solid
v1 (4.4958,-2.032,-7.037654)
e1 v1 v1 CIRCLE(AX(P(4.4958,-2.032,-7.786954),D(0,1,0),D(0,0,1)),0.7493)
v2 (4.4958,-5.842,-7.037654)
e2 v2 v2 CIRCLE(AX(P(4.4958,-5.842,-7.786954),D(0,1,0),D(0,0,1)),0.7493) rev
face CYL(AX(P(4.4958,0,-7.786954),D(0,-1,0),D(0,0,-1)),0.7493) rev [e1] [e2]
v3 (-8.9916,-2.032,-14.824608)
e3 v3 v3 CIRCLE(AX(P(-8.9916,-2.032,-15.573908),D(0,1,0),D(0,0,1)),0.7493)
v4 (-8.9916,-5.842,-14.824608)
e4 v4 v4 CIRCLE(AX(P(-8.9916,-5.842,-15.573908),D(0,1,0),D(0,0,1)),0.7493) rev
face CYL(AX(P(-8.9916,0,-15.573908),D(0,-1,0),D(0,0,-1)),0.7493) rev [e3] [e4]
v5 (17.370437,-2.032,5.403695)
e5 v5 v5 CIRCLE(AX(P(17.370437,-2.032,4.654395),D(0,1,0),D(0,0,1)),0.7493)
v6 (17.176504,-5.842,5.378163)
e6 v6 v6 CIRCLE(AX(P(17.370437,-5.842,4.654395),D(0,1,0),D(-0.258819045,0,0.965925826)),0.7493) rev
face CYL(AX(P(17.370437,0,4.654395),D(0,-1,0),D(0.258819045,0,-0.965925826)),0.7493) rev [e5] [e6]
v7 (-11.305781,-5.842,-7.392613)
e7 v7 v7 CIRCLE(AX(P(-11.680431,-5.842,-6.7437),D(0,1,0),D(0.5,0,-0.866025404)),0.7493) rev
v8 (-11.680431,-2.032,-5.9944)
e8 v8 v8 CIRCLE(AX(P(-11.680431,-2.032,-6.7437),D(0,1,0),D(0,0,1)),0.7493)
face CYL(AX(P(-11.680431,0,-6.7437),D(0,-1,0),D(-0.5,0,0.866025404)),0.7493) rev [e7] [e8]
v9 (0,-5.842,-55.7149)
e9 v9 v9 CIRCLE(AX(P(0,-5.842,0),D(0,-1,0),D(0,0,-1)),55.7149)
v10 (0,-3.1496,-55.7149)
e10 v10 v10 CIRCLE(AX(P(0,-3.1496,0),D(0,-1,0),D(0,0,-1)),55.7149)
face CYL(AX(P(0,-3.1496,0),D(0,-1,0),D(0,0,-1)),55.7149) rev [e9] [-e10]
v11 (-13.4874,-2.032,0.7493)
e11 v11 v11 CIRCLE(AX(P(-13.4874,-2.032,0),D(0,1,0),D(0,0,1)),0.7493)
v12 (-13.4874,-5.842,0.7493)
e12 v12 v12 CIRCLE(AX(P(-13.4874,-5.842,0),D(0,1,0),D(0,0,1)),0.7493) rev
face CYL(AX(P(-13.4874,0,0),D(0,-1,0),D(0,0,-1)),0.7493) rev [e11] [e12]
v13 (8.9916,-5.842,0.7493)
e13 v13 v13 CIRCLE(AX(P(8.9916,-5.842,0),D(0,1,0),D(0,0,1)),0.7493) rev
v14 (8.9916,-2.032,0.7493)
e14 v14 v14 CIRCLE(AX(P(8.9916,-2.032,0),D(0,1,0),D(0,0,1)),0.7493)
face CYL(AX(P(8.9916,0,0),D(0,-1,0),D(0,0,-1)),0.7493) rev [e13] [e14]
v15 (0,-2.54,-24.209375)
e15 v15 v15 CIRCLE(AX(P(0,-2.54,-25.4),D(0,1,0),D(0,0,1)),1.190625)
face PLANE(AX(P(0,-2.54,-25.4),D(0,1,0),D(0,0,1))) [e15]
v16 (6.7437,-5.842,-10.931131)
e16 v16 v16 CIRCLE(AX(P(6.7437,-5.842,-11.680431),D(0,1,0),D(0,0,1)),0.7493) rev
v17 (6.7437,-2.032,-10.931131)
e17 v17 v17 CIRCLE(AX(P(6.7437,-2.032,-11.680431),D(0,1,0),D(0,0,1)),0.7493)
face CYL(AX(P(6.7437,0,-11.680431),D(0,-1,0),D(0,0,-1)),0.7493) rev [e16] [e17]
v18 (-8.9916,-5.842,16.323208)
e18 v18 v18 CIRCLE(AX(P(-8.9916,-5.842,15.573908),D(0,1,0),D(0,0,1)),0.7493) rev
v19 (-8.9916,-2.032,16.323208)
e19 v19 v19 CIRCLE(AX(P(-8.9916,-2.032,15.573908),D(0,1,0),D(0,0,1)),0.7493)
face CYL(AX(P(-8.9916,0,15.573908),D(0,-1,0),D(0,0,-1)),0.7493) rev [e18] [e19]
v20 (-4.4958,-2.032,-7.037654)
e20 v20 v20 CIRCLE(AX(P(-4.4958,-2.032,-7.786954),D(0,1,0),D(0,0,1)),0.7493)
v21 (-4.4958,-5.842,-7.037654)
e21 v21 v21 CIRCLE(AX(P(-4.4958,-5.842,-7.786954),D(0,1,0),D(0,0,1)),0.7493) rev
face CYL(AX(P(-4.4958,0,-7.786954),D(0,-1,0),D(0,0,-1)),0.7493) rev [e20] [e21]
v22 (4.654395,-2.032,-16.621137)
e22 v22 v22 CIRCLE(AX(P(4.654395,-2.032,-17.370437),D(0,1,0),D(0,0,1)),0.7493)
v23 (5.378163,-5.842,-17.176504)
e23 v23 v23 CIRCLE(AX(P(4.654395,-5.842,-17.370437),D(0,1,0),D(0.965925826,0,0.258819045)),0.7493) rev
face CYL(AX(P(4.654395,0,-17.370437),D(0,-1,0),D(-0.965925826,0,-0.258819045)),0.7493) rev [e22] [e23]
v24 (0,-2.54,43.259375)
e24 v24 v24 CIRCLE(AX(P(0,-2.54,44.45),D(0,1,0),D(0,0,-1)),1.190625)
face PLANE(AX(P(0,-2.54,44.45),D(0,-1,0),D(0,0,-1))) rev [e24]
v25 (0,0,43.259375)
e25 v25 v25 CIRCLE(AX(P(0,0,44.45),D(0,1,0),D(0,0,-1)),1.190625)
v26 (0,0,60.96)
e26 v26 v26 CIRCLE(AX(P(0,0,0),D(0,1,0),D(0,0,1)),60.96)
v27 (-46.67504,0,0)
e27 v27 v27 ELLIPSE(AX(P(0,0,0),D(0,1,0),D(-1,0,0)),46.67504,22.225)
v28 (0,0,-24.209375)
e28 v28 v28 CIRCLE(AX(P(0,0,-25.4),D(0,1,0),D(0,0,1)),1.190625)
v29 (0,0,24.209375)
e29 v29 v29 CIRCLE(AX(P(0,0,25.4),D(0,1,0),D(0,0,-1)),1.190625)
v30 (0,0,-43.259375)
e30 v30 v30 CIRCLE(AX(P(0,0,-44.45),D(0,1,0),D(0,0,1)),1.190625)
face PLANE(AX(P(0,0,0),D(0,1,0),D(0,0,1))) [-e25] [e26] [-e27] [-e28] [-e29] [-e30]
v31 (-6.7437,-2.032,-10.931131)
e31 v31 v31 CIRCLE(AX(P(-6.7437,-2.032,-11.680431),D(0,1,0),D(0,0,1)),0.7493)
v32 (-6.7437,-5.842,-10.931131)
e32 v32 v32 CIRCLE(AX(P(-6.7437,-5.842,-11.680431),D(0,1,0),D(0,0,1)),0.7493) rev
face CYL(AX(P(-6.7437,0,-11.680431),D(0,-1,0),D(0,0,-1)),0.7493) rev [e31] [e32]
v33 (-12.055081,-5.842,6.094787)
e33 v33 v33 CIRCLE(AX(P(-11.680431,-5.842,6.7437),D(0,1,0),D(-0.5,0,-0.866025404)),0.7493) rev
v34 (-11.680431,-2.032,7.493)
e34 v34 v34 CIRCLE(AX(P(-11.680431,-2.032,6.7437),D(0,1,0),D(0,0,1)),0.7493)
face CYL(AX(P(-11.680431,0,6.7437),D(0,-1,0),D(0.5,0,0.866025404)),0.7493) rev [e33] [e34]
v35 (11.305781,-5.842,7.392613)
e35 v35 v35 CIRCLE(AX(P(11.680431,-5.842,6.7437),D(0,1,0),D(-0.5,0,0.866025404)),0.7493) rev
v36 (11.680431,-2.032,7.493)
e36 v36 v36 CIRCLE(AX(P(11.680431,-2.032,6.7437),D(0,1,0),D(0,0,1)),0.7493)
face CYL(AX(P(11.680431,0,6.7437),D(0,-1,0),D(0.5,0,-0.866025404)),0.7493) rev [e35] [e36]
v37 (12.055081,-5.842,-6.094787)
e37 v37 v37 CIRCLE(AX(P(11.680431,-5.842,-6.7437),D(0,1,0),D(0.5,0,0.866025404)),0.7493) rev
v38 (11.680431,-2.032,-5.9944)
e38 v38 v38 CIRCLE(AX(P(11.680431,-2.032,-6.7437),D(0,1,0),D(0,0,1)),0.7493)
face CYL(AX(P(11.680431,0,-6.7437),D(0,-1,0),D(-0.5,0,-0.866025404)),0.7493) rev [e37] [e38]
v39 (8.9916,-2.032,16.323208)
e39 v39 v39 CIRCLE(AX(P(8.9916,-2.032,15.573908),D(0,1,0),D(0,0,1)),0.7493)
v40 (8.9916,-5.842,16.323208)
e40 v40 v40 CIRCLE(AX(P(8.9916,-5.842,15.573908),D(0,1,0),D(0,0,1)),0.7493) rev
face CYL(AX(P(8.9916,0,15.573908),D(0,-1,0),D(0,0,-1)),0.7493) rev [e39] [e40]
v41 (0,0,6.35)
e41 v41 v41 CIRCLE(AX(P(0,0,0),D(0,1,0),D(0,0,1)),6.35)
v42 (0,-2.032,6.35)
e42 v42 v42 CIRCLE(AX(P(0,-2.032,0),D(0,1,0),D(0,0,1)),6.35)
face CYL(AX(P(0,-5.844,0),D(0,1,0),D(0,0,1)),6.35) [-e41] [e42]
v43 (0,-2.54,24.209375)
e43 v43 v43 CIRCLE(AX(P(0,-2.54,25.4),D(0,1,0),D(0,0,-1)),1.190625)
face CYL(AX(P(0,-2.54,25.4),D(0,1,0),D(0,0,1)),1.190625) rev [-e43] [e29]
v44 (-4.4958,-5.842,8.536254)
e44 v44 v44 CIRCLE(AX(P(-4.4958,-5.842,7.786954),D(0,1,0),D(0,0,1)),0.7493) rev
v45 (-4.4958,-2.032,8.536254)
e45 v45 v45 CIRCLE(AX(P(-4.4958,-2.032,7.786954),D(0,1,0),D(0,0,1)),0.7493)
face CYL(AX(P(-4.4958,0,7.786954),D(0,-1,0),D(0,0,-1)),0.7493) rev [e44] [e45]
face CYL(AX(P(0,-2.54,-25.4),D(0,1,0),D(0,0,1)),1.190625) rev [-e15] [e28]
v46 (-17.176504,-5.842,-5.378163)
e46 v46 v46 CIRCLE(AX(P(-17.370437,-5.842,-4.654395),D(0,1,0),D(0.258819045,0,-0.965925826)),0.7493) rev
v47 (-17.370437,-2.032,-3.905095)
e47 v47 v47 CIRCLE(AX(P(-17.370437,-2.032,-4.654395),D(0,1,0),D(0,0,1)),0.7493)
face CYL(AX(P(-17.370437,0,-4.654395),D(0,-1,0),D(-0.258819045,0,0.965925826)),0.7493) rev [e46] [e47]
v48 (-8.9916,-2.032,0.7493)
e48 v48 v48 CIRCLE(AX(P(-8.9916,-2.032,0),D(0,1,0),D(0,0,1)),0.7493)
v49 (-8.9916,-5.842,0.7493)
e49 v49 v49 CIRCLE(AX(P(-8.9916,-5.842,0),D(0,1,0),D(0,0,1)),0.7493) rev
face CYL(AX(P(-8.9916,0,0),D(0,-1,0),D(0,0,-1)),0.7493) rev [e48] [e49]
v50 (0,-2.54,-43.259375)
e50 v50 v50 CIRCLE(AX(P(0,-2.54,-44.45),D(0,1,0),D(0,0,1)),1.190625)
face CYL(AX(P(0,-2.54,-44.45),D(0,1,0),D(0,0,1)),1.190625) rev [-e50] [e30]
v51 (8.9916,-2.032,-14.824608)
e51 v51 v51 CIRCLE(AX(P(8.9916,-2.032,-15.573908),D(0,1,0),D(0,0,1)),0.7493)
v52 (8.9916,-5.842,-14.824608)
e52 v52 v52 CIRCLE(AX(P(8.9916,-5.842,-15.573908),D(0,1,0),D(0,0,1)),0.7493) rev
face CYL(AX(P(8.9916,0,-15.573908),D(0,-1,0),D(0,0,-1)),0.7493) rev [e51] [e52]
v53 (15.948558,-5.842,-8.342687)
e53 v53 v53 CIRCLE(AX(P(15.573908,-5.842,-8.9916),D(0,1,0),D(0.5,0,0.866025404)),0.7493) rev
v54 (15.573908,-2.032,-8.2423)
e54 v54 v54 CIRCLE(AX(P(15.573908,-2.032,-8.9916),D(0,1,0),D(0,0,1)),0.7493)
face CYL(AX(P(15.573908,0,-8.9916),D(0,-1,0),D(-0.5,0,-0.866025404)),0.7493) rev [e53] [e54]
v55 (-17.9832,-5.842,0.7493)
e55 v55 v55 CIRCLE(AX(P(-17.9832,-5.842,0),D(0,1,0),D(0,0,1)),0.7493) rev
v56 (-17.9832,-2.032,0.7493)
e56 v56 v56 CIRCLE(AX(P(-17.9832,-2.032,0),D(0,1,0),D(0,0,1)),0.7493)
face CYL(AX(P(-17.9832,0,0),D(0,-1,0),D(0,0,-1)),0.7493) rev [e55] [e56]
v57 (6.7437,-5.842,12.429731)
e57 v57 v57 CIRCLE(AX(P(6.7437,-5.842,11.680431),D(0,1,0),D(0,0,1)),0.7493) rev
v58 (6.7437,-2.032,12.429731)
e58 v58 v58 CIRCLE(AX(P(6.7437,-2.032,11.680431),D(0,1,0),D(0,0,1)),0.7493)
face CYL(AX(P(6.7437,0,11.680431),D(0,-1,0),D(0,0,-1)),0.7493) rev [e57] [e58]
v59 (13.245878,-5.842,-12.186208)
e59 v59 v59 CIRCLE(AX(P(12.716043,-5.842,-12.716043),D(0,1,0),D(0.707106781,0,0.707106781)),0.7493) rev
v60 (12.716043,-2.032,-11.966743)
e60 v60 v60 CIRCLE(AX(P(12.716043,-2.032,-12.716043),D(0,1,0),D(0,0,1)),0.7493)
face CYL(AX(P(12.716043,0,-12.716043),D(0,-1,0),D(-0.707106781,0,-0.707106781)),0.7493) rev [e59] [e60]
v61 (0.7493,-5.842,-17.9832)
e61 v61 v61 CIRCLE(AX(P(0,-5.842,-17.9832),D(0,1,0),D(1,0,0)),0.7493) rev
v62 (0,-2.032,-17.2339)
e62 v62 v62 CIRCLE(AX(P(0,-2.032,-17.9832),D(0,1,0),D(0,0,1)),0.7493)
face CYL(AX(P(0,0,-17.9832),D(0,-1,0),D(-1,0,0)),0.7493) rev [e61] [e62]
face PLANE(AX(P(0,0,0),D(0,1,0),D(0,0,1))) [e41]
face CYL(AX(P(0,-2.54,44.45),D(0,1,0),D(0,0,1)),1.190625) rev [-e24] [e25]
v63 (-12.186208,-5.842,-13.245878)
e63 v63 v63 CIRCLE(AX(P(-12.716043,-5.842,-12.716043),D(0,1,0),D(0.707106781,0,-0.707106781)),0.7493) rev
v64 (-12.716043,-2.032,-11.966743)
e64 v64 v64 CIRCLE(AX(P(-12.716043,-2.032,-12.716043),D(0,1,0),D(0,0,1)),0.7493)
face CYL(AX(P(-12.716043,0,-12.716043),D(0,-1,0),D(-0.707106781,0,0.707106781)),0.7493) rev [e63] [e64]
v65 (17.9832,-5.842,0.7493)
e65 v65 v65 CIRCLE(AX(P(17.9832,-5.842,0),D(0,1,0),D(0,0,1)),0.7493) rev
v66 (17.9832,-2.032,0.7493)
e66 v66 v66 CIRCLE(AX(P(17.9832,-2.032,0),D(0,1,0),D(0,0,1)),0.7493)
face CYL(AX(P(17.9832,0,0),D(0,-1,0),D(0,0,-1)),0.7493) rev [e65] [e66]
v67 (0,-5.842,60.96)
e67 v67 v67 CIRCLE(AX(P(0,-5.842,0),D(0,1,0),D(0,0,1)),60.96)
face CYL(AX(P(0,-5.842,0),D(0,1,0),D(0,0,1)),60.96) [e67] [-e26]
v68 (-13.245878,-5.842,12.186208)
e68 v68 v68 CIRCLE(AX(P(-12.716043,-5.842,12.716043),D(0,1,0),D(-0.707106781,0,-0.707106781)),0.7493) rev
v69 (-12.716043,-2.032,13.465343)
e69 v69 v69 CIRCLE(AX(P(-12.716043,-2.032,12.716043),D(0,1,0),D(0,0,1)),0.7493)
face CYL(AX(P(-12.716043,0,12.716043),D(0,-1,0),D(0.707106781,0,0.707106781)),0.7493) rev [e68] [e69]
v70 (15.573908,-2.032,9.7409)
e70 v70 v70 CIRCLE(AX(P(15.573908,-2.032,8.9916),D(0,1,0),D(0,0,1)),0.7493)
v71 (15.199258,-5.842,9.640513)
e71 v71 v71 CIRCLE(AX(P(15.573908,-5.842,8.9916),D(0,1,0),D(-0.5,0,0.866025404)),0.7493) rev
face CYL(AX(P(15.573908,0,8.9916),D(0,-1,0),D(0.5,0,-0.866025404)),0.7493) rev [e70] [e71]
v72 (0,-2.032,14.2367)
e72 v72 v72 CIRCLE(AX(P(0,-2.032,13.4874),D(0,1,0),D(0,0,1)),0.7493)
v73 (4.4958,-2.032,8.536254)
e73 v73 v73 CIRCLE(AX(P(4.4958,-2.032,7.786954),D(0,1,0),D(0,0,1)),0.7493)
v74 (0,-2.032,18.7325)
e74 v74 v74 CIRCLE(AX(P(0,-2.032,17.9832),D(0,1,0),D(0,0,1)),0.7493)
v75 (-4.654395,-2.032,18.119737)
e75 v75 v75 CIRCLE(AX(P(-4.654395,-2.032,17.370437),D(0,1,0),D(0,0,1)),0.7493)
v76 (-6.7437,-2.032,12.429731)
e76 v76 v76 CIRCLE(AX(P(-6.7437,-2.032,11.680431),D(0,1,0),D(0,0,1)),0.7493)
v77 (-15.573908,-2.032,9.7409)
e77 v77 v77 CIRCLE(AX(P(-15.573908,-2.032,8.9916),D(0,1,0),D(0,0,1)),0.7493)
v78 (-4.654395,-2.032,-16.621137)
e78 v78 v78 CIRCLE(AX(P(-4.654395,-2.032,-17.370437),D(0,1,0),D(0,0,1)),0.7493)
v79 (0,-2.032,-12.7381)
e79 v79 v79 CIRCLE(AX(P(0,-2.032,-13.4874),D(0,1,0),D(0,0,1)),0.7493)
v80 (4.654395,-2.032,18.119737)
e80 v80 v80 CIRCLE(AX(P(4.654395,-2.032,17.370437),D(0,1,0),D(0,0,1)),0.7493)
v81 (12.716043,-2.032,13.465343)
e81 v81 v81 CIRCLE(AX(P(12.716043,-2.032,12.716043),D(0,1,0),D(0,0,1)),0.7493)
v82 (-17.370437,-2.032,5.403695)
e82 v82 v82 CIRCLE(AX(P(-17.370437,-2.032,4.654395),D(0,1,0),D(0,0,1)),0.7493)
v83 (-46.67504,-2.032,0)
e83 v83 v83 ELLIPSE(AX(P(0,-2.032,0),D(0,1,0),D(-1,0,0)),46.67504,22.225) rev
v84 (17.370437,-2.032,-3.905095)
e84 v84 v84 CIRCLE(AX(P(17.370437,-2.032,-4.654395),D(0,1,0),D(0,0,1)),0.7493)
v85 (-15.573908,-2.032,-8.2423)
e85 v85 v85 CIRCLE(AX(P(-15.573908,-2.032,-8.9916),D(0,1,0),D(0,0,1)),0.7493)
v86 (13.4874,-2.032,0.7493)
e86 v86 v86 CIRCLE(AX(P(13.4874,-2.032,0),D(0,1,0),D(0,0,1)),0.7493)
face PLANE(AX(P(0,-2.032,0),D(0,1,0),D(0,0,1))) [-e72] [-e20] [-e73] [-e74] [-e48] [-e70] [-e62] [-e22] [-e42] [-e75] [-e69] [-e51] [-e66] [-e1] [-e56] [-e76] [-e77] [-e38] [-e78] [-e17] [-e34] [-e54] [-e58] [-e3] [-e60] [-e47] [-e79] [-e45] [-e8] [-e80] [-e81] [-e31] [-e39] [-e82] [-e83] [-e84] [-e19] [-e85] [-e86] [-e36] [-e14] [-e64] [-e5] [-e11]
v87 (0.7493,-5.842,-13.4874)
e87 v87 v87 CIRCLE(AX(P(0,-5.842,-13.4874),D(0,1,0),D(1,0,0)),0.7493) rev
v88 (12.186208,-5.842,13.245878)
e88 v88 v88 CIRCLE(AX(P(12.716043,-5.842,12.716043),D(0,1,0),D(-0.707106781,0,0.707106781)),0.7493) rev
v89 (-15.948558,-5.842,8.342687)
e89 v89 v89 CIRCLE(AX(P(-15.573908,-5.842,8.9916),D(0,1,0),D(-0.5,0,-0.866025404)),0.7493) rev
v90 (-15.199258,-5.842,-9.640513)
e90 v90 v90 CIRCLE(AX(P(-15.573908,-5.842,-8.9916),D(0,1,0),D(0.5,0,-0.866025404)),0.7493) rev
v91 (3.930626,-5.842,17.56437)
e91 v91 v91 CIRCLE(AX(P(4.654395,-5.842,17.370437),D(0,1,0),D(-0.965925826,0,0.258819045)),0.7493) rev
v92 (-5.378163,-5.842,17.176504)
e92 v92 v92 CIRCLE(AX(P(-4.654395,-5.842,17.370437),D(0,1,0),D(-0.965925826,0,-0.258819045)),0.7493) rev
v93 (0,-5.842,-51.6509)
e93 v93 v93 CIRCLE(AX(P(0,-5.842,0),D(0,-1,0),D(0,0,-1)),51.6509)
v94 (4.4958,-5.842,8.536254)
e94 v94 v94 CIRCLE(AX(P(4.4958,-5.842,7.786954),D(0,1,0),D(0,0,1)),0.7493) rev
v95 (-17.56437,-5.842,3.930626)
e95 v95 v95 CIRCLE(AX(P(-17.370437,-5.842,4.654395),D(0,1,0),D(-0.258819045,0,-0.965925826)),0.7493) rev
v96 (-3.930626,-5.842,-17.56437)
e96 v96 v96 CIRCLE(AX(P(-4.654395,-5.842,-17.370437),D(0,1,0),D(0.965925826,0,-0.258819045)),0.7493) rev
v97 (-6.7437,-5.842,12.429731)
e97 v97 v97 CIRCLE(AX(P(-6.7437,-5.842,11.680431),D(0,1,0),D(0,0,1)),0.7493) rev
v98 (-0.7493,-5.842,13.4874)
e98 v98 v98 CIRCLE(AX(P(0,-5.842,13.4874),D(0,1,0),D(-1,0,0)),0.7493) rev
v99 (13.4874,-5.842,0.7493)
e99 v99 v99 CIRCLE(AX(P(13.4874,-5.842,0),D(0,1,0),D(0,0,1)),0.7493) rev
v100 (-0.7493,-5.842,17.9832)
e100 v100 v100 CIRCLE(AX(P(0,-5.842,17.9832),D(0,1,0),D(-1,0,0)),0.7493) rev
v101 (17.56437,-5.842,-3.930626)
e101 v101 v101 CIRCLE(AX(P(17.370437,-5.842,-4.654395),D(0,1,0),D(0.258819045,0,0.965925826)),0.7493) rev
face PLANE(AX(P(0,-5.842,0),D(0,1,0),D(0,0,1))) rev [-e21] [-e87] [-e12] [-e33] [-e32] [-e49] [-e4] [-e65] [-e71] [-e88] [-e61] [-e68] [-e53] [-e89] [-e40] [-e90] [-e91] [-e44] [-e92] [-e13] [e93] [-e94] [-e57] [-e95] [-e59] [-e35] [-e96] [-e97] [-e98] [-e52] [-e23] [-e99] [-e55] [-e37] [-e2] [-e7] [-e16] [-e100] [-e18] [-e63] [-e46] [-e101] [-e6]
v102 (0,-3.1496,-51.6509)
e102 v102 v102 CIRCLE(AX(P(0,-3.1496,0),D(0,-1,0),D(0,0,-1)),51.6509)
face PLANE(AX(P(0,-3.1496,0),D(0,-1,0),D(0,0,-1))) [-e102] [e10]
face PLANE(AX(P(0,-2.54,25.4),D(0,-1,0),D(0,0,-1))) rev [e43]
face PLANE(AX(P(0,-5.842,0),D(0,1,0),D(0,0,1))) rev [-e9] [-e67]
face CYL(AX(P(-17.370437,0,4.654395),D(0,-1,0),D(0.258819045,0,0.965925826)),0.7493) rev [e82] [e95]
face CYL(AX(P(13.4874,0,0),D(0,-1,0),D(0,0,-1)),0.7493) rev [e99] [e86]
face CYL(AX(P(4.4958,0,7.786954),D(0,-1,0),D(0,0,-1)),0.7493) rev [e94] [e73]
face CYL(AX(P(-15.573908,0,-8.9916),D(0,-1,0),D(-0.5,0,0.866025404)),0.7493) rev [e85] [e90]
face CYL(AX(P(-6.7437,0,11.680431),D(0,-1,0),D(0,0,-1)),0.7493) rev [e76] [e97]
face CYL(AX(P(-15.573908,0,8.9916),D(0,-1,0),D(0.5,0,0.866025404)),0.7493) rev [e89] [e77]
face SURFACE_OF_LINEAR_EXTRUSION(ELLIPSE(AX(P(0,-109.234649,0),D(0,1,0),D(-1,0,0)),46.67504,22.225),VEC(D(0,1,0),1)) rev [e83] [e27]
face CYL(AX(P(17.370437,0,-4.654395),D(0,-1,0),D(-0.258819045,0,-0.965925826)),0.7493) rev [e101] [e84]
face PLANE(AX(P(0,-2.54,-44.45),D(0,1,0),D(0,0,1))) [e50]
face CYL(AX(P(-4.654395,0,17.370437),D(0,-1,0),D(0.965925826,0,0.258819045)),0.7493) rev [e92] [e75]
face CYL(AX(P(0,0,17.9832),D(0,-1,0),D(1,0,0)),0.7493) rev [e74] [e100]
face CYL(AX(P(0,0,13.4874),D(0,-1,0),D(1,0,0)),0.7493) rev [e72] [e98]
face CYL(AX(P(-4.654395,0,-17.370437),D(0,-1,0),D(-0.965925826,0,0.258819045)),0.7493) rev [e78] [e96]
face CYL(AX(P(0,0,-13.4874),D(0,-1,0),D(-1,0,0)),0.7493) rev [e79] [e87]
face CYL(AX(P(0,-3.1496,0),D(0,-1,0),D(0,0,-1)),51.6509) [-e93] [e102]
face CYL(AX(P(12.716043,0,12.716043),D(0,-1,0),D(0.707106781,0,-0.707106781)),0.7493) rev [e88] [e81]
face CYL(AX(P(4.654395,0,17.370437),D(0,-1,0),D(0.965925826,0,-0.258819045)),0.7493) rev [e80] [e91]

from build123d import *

# Parameters (mm, degrees)
SKETCH1_R                       = 60.96
BILLET_DEPTH                    = 5.842
SKETCH4_R                       = 0.7493
FIRST_KEROSENE_OUTLET_DEPTH     = 88.140881336
PRIMARY_HOLES_COUNT             = 6
SECOND_START                    = -5.842
SECOND_RING_OUTLINE_R           = 0.7493
SECOND_RING_DEPTH               = 5.842
THIRD_START                     = -5.842
THIRD_RING_OUTLINE_R            = 0.7493
THIRD_RING_DEPTH                = 5.842
SKETCH18_RX                     = 46.67504
SKETCH18_RY                     = 22.225
KEROSENE_WELL_DEPTH             = 2.032
SKETCH17_R                      = 6.35
BOSS_EXTRUDE1_DEPTH             = 2.54
BOSS_EXTRUDE1_DIRECTION_2_REACH = 88.408
SKETCH21_R                      = 6.35
CUT_EXTRUDE1_DEPTH              = 2.54
SKETCH32_R                      = 55.7149
SKETCH32_R_2                    = 51.6509
CUT_EXTRUDE5_DEPTH              = 2.6924
SKETCH20_R                      = 1.190625
CUT_EXTRUDE6_DEPTH              = 2.54


# Read off the part's stored shape, not the designer's step: Second ring, Third Ring
with BuildPart() as part:
    # Sketch1 → Billet (new body)
    with BuildSketch(Plane(origin=(0, 0, 0), x_dir=(1, 0, 0), z_dir=(0, 1, 0))):
        with Locations(Location((0, 0, 0), (0, 0, 270))):
            Circle(SKETCH1_R)
    extrude(amount=-BILLET_DEPTH)

    # Sketch4 → First Kerosene Outlet (cut, symmetric)
    with BuildSketch(Plane(origin=(0, -12.7, 0), x_dir=(1, 0, 0), z_dir=(0, 1, 0))):
        with Locations(Location((8.9916, 0, 0), (0, 0, 270))):
            Circle(SKETCH4_R)
        with Locations(Location((13.4874, 0, 0), (0, 0, 270))):
            Circle(SKETCH4_R)
        with Locations(Location((17.9832, 0, 0), (0, 0, 270))):
            Circle(SKETCH4_R)
    first_kerosene_outlet = extrude(amount=FIRST_KEROSENE_OUTLET_DEPTH, both=True, mode=Mode.SUBTRACT)

    # Primary Holes: First Kerosene Outlet ×6 about axis
    primary_holes_axis = Axis((0, 0, 0), (0, 1, 0))
    for i in range(1, PRIMARY_HOLES_COUNT):
        add(first_kerosene_outlet.rotate(primary_holes_axis, i * 360 / PRIMARY_HOLES_COUNT), mode=Mode.SUBTRACT)

    # Second ring outline → Second ring (cut)
    with BuildSketch(Plane(origin=(0, 0, 0), x_dir=(1, 0, 0), z_dir=(0, 1, 0)).offset(SECOND_START)):
        with Locations((11.680431031, 6.7437)):
            Circle(SECOND_RING_OUTLINE_R)
        with Locations((0, 13.4874)):
            Circle(SECOND_RING_OUTLINE_R)
        with Locations((-11.680431031, 6.7437)):
            Circle(SECOND_RING_OUTLINE_R)
        with Locations((-11.680431031, -6.7437)):
            Circle(SECOND_RING_OUTLINE_R)
        with Locations((0, -13.4874)):
            Circle(SECOND_RING_OUTLINE_R)
        with Locations((11.680431031, -6.7437)):
            Circle(SECOND_RING_OUTLINE_R)
    extrude(amount=SECOND_RING_DEPTH, mode=Mode.SUBTRACT)

    # Third Ring outline → Third Ring (cut)
    with BuildSketch(Plane(origin=(0, 0, 0), x_dir=(1, 0, 0), z_dir=(0, 1, 0)).offset(THIRD_START)):
        with Locations((17.370437319, 4.654394652)):
            Circle(THIRD_RING_OUTLINE_R)
        with Locations((15.573908041, 8.9916)):
            Circle(THIRD_RING_OUTLINE_R)
        with Locations((12.716042667, 12.716042667)):
            Circle(THIRD_RING_OUTLINE_R)
        with Locations((4.654394652, 17.370437319)):
            Circle(THIRD_RING_OUTLINE_R)
        with Locations((0, 17.9832)):
            Circle(THIRD_RING_OUTLINE_R)
        with Locations((-4.654394652, 17.370437319)):
            Circle(THIRD_RING_OUTLINE_R)
        with Locations((-12.716042667, 12.716042667)):
            Circle(THIRD_RING_OUTLINE_R)
        with Locations((-15.573908041, 8.9916)):
            Circle(THIRD_RING_OUTLINE_R)
        with Locations((-17.370437319, 4.654394652)):
            Circle(THIRD_RING_OUTLINE_R)
        with Locations((-17.370437319, -4.654394652)):
            Circle(THIRD_RING_OUTLINE_R)
        with Locations((-15.573908041, -8.9916)):
            Circle(THIRD_RING_OUTLINE_R)
        with Locations((-12.716042667, -12.716042667)):
            Circle(THIRD_RING_OUTLINE_R)
        with Locations((-4.654394652, -17.370437319)):
            Circle(THIRD_RING_OUTLINE_R)
        with Locations((0, -17.9832)):
            Circle(THIRD_RING_OUTLINE_R)
        with Locations((4.654394652, -17.370437319)):
            Circle(THIRD_RING_OUTLINE_R)
        with Locations((12.716042667, -12.716042667)):
            Circle(THIRD_RING_OUTLINE_R)
        with Locations((15.573908041, -8.9916)):
            Circle(THIRD_RING_OUTLINE_R)
        with Locations((17.370437319, -4.654394652)):
            Circle(THIRD_RING_OUTLINE_R)
    extrude(amount=THIRD_RING_DEPTH, mode=Mode.SUBTRACT)

    # Sketch18 → Kerosene Well (cut)
    with BuildSketch(Plane(origin=(0, 0, 0), x_dir=(1, 0, 0), z_dir=(0, 1, 0))):
        with Locations(Location((0, 0), (0, 0, -180))):
            Ellipse(SKETCH18_RX, SKETCH18_RY)
    extrude(amount=-KEROSENE_WELL_DEPTH, mode=Mode.SUBTRACT)

    # Sketch17 → Boss-Extrude1 (add)
    with BuildSketch(Plane(origin=(0, 0, 0), x_dir=(1, 0, 0), z_dir=(0, 1, 0))):
        with Locations(Location((0, 0, 0), (0, 0, 270))):
            Circle(SKETCH17_R)
    extrude(amount=BOSS_EXTRUDE1_DEPTH)

    # Sketch17 → Boss-Extrude1 direction 2 (add, up to next)
    with BuildSketch(Plane(origin=(0, 0, 0), x_dir=(1, 0, 0), z_dir=(0, 1, 0)), mode=Mode.PRIVATE) as boss_extrude1_direction_2_sk1:
        with Locations(Location((0, 0, 0), (0, 0, 270))):
            Circle(SKETCH17_R)
    boss_extrude1_direction_2_tool1 = extrude(boss_extrude1_direction_2_sk1.sketch, amount=-BOSS_EXTRUDE1_DIRECTION_2_REACH, mode=Mode.PRIVATE) - part.part
    add(boss_extrude1_direction_2_tool1.solids().sort_by_distance((0, 0, 0))[0])

    # Sketch21 → Cut-Extrude1 (cut)
    with BuildSketch(Plane(origin=(0, 2.54, 0), x_dir=(1, 0, 0), z_dir=(0, 1, 0))):
        with Locations(Location((0, 0, 0), (0, 0, 270))):
            Circle(SKETCH21_R)
    extrude(amount=-CUT_EXTRUDE1_DEPTH, mode=Mode.SUBTRACT)

    # Sketch32 → Cut-Extrude5 (cut)
    with BuildSketch(Plane.XZ.offset(5.842)):
        with Locations(Location((0, 0, 0), (0, 0, 270))):
            Circle(SKETCH32_R)
        with Locations(Location((0, 0, 0), (0, 0, 270))):
            Circle(SKETCH32_R_2, mode=Mode.SUBTRACT)
    extrude(amount=-CUT_EXTRUDE5_DEPTH, mode=Mode.SUBTRACT)

    # Sketch20 → Cut-Extrude6 (cut)
    with BuildSketch(Plane(origin=(0, 0, 0), x_dir=(1, 0, 0), z_dir=(0, 1, 0))):
        with Locations(Location((0, 25.4, 0), (0, 0, 270))):
            Circle(SKETCH20_R)
        with Locations(Location((0, -25.4, 0), (0, 0, 90))):
            Circle(SKETCH20_R)
        with Locations(Location((0, 44.45, 0), (0, 0, 270))):
            Circle(SKETCH20_R)
        with Locations(Location((0, -44.45, 0), (0, 0, 90))):
            Circle(SKETCH20_R)
    extrude(amount=-CUT_EXTRUDE6_DEPTH, mode=Mode.SUBTRACT)


solid = part.part
